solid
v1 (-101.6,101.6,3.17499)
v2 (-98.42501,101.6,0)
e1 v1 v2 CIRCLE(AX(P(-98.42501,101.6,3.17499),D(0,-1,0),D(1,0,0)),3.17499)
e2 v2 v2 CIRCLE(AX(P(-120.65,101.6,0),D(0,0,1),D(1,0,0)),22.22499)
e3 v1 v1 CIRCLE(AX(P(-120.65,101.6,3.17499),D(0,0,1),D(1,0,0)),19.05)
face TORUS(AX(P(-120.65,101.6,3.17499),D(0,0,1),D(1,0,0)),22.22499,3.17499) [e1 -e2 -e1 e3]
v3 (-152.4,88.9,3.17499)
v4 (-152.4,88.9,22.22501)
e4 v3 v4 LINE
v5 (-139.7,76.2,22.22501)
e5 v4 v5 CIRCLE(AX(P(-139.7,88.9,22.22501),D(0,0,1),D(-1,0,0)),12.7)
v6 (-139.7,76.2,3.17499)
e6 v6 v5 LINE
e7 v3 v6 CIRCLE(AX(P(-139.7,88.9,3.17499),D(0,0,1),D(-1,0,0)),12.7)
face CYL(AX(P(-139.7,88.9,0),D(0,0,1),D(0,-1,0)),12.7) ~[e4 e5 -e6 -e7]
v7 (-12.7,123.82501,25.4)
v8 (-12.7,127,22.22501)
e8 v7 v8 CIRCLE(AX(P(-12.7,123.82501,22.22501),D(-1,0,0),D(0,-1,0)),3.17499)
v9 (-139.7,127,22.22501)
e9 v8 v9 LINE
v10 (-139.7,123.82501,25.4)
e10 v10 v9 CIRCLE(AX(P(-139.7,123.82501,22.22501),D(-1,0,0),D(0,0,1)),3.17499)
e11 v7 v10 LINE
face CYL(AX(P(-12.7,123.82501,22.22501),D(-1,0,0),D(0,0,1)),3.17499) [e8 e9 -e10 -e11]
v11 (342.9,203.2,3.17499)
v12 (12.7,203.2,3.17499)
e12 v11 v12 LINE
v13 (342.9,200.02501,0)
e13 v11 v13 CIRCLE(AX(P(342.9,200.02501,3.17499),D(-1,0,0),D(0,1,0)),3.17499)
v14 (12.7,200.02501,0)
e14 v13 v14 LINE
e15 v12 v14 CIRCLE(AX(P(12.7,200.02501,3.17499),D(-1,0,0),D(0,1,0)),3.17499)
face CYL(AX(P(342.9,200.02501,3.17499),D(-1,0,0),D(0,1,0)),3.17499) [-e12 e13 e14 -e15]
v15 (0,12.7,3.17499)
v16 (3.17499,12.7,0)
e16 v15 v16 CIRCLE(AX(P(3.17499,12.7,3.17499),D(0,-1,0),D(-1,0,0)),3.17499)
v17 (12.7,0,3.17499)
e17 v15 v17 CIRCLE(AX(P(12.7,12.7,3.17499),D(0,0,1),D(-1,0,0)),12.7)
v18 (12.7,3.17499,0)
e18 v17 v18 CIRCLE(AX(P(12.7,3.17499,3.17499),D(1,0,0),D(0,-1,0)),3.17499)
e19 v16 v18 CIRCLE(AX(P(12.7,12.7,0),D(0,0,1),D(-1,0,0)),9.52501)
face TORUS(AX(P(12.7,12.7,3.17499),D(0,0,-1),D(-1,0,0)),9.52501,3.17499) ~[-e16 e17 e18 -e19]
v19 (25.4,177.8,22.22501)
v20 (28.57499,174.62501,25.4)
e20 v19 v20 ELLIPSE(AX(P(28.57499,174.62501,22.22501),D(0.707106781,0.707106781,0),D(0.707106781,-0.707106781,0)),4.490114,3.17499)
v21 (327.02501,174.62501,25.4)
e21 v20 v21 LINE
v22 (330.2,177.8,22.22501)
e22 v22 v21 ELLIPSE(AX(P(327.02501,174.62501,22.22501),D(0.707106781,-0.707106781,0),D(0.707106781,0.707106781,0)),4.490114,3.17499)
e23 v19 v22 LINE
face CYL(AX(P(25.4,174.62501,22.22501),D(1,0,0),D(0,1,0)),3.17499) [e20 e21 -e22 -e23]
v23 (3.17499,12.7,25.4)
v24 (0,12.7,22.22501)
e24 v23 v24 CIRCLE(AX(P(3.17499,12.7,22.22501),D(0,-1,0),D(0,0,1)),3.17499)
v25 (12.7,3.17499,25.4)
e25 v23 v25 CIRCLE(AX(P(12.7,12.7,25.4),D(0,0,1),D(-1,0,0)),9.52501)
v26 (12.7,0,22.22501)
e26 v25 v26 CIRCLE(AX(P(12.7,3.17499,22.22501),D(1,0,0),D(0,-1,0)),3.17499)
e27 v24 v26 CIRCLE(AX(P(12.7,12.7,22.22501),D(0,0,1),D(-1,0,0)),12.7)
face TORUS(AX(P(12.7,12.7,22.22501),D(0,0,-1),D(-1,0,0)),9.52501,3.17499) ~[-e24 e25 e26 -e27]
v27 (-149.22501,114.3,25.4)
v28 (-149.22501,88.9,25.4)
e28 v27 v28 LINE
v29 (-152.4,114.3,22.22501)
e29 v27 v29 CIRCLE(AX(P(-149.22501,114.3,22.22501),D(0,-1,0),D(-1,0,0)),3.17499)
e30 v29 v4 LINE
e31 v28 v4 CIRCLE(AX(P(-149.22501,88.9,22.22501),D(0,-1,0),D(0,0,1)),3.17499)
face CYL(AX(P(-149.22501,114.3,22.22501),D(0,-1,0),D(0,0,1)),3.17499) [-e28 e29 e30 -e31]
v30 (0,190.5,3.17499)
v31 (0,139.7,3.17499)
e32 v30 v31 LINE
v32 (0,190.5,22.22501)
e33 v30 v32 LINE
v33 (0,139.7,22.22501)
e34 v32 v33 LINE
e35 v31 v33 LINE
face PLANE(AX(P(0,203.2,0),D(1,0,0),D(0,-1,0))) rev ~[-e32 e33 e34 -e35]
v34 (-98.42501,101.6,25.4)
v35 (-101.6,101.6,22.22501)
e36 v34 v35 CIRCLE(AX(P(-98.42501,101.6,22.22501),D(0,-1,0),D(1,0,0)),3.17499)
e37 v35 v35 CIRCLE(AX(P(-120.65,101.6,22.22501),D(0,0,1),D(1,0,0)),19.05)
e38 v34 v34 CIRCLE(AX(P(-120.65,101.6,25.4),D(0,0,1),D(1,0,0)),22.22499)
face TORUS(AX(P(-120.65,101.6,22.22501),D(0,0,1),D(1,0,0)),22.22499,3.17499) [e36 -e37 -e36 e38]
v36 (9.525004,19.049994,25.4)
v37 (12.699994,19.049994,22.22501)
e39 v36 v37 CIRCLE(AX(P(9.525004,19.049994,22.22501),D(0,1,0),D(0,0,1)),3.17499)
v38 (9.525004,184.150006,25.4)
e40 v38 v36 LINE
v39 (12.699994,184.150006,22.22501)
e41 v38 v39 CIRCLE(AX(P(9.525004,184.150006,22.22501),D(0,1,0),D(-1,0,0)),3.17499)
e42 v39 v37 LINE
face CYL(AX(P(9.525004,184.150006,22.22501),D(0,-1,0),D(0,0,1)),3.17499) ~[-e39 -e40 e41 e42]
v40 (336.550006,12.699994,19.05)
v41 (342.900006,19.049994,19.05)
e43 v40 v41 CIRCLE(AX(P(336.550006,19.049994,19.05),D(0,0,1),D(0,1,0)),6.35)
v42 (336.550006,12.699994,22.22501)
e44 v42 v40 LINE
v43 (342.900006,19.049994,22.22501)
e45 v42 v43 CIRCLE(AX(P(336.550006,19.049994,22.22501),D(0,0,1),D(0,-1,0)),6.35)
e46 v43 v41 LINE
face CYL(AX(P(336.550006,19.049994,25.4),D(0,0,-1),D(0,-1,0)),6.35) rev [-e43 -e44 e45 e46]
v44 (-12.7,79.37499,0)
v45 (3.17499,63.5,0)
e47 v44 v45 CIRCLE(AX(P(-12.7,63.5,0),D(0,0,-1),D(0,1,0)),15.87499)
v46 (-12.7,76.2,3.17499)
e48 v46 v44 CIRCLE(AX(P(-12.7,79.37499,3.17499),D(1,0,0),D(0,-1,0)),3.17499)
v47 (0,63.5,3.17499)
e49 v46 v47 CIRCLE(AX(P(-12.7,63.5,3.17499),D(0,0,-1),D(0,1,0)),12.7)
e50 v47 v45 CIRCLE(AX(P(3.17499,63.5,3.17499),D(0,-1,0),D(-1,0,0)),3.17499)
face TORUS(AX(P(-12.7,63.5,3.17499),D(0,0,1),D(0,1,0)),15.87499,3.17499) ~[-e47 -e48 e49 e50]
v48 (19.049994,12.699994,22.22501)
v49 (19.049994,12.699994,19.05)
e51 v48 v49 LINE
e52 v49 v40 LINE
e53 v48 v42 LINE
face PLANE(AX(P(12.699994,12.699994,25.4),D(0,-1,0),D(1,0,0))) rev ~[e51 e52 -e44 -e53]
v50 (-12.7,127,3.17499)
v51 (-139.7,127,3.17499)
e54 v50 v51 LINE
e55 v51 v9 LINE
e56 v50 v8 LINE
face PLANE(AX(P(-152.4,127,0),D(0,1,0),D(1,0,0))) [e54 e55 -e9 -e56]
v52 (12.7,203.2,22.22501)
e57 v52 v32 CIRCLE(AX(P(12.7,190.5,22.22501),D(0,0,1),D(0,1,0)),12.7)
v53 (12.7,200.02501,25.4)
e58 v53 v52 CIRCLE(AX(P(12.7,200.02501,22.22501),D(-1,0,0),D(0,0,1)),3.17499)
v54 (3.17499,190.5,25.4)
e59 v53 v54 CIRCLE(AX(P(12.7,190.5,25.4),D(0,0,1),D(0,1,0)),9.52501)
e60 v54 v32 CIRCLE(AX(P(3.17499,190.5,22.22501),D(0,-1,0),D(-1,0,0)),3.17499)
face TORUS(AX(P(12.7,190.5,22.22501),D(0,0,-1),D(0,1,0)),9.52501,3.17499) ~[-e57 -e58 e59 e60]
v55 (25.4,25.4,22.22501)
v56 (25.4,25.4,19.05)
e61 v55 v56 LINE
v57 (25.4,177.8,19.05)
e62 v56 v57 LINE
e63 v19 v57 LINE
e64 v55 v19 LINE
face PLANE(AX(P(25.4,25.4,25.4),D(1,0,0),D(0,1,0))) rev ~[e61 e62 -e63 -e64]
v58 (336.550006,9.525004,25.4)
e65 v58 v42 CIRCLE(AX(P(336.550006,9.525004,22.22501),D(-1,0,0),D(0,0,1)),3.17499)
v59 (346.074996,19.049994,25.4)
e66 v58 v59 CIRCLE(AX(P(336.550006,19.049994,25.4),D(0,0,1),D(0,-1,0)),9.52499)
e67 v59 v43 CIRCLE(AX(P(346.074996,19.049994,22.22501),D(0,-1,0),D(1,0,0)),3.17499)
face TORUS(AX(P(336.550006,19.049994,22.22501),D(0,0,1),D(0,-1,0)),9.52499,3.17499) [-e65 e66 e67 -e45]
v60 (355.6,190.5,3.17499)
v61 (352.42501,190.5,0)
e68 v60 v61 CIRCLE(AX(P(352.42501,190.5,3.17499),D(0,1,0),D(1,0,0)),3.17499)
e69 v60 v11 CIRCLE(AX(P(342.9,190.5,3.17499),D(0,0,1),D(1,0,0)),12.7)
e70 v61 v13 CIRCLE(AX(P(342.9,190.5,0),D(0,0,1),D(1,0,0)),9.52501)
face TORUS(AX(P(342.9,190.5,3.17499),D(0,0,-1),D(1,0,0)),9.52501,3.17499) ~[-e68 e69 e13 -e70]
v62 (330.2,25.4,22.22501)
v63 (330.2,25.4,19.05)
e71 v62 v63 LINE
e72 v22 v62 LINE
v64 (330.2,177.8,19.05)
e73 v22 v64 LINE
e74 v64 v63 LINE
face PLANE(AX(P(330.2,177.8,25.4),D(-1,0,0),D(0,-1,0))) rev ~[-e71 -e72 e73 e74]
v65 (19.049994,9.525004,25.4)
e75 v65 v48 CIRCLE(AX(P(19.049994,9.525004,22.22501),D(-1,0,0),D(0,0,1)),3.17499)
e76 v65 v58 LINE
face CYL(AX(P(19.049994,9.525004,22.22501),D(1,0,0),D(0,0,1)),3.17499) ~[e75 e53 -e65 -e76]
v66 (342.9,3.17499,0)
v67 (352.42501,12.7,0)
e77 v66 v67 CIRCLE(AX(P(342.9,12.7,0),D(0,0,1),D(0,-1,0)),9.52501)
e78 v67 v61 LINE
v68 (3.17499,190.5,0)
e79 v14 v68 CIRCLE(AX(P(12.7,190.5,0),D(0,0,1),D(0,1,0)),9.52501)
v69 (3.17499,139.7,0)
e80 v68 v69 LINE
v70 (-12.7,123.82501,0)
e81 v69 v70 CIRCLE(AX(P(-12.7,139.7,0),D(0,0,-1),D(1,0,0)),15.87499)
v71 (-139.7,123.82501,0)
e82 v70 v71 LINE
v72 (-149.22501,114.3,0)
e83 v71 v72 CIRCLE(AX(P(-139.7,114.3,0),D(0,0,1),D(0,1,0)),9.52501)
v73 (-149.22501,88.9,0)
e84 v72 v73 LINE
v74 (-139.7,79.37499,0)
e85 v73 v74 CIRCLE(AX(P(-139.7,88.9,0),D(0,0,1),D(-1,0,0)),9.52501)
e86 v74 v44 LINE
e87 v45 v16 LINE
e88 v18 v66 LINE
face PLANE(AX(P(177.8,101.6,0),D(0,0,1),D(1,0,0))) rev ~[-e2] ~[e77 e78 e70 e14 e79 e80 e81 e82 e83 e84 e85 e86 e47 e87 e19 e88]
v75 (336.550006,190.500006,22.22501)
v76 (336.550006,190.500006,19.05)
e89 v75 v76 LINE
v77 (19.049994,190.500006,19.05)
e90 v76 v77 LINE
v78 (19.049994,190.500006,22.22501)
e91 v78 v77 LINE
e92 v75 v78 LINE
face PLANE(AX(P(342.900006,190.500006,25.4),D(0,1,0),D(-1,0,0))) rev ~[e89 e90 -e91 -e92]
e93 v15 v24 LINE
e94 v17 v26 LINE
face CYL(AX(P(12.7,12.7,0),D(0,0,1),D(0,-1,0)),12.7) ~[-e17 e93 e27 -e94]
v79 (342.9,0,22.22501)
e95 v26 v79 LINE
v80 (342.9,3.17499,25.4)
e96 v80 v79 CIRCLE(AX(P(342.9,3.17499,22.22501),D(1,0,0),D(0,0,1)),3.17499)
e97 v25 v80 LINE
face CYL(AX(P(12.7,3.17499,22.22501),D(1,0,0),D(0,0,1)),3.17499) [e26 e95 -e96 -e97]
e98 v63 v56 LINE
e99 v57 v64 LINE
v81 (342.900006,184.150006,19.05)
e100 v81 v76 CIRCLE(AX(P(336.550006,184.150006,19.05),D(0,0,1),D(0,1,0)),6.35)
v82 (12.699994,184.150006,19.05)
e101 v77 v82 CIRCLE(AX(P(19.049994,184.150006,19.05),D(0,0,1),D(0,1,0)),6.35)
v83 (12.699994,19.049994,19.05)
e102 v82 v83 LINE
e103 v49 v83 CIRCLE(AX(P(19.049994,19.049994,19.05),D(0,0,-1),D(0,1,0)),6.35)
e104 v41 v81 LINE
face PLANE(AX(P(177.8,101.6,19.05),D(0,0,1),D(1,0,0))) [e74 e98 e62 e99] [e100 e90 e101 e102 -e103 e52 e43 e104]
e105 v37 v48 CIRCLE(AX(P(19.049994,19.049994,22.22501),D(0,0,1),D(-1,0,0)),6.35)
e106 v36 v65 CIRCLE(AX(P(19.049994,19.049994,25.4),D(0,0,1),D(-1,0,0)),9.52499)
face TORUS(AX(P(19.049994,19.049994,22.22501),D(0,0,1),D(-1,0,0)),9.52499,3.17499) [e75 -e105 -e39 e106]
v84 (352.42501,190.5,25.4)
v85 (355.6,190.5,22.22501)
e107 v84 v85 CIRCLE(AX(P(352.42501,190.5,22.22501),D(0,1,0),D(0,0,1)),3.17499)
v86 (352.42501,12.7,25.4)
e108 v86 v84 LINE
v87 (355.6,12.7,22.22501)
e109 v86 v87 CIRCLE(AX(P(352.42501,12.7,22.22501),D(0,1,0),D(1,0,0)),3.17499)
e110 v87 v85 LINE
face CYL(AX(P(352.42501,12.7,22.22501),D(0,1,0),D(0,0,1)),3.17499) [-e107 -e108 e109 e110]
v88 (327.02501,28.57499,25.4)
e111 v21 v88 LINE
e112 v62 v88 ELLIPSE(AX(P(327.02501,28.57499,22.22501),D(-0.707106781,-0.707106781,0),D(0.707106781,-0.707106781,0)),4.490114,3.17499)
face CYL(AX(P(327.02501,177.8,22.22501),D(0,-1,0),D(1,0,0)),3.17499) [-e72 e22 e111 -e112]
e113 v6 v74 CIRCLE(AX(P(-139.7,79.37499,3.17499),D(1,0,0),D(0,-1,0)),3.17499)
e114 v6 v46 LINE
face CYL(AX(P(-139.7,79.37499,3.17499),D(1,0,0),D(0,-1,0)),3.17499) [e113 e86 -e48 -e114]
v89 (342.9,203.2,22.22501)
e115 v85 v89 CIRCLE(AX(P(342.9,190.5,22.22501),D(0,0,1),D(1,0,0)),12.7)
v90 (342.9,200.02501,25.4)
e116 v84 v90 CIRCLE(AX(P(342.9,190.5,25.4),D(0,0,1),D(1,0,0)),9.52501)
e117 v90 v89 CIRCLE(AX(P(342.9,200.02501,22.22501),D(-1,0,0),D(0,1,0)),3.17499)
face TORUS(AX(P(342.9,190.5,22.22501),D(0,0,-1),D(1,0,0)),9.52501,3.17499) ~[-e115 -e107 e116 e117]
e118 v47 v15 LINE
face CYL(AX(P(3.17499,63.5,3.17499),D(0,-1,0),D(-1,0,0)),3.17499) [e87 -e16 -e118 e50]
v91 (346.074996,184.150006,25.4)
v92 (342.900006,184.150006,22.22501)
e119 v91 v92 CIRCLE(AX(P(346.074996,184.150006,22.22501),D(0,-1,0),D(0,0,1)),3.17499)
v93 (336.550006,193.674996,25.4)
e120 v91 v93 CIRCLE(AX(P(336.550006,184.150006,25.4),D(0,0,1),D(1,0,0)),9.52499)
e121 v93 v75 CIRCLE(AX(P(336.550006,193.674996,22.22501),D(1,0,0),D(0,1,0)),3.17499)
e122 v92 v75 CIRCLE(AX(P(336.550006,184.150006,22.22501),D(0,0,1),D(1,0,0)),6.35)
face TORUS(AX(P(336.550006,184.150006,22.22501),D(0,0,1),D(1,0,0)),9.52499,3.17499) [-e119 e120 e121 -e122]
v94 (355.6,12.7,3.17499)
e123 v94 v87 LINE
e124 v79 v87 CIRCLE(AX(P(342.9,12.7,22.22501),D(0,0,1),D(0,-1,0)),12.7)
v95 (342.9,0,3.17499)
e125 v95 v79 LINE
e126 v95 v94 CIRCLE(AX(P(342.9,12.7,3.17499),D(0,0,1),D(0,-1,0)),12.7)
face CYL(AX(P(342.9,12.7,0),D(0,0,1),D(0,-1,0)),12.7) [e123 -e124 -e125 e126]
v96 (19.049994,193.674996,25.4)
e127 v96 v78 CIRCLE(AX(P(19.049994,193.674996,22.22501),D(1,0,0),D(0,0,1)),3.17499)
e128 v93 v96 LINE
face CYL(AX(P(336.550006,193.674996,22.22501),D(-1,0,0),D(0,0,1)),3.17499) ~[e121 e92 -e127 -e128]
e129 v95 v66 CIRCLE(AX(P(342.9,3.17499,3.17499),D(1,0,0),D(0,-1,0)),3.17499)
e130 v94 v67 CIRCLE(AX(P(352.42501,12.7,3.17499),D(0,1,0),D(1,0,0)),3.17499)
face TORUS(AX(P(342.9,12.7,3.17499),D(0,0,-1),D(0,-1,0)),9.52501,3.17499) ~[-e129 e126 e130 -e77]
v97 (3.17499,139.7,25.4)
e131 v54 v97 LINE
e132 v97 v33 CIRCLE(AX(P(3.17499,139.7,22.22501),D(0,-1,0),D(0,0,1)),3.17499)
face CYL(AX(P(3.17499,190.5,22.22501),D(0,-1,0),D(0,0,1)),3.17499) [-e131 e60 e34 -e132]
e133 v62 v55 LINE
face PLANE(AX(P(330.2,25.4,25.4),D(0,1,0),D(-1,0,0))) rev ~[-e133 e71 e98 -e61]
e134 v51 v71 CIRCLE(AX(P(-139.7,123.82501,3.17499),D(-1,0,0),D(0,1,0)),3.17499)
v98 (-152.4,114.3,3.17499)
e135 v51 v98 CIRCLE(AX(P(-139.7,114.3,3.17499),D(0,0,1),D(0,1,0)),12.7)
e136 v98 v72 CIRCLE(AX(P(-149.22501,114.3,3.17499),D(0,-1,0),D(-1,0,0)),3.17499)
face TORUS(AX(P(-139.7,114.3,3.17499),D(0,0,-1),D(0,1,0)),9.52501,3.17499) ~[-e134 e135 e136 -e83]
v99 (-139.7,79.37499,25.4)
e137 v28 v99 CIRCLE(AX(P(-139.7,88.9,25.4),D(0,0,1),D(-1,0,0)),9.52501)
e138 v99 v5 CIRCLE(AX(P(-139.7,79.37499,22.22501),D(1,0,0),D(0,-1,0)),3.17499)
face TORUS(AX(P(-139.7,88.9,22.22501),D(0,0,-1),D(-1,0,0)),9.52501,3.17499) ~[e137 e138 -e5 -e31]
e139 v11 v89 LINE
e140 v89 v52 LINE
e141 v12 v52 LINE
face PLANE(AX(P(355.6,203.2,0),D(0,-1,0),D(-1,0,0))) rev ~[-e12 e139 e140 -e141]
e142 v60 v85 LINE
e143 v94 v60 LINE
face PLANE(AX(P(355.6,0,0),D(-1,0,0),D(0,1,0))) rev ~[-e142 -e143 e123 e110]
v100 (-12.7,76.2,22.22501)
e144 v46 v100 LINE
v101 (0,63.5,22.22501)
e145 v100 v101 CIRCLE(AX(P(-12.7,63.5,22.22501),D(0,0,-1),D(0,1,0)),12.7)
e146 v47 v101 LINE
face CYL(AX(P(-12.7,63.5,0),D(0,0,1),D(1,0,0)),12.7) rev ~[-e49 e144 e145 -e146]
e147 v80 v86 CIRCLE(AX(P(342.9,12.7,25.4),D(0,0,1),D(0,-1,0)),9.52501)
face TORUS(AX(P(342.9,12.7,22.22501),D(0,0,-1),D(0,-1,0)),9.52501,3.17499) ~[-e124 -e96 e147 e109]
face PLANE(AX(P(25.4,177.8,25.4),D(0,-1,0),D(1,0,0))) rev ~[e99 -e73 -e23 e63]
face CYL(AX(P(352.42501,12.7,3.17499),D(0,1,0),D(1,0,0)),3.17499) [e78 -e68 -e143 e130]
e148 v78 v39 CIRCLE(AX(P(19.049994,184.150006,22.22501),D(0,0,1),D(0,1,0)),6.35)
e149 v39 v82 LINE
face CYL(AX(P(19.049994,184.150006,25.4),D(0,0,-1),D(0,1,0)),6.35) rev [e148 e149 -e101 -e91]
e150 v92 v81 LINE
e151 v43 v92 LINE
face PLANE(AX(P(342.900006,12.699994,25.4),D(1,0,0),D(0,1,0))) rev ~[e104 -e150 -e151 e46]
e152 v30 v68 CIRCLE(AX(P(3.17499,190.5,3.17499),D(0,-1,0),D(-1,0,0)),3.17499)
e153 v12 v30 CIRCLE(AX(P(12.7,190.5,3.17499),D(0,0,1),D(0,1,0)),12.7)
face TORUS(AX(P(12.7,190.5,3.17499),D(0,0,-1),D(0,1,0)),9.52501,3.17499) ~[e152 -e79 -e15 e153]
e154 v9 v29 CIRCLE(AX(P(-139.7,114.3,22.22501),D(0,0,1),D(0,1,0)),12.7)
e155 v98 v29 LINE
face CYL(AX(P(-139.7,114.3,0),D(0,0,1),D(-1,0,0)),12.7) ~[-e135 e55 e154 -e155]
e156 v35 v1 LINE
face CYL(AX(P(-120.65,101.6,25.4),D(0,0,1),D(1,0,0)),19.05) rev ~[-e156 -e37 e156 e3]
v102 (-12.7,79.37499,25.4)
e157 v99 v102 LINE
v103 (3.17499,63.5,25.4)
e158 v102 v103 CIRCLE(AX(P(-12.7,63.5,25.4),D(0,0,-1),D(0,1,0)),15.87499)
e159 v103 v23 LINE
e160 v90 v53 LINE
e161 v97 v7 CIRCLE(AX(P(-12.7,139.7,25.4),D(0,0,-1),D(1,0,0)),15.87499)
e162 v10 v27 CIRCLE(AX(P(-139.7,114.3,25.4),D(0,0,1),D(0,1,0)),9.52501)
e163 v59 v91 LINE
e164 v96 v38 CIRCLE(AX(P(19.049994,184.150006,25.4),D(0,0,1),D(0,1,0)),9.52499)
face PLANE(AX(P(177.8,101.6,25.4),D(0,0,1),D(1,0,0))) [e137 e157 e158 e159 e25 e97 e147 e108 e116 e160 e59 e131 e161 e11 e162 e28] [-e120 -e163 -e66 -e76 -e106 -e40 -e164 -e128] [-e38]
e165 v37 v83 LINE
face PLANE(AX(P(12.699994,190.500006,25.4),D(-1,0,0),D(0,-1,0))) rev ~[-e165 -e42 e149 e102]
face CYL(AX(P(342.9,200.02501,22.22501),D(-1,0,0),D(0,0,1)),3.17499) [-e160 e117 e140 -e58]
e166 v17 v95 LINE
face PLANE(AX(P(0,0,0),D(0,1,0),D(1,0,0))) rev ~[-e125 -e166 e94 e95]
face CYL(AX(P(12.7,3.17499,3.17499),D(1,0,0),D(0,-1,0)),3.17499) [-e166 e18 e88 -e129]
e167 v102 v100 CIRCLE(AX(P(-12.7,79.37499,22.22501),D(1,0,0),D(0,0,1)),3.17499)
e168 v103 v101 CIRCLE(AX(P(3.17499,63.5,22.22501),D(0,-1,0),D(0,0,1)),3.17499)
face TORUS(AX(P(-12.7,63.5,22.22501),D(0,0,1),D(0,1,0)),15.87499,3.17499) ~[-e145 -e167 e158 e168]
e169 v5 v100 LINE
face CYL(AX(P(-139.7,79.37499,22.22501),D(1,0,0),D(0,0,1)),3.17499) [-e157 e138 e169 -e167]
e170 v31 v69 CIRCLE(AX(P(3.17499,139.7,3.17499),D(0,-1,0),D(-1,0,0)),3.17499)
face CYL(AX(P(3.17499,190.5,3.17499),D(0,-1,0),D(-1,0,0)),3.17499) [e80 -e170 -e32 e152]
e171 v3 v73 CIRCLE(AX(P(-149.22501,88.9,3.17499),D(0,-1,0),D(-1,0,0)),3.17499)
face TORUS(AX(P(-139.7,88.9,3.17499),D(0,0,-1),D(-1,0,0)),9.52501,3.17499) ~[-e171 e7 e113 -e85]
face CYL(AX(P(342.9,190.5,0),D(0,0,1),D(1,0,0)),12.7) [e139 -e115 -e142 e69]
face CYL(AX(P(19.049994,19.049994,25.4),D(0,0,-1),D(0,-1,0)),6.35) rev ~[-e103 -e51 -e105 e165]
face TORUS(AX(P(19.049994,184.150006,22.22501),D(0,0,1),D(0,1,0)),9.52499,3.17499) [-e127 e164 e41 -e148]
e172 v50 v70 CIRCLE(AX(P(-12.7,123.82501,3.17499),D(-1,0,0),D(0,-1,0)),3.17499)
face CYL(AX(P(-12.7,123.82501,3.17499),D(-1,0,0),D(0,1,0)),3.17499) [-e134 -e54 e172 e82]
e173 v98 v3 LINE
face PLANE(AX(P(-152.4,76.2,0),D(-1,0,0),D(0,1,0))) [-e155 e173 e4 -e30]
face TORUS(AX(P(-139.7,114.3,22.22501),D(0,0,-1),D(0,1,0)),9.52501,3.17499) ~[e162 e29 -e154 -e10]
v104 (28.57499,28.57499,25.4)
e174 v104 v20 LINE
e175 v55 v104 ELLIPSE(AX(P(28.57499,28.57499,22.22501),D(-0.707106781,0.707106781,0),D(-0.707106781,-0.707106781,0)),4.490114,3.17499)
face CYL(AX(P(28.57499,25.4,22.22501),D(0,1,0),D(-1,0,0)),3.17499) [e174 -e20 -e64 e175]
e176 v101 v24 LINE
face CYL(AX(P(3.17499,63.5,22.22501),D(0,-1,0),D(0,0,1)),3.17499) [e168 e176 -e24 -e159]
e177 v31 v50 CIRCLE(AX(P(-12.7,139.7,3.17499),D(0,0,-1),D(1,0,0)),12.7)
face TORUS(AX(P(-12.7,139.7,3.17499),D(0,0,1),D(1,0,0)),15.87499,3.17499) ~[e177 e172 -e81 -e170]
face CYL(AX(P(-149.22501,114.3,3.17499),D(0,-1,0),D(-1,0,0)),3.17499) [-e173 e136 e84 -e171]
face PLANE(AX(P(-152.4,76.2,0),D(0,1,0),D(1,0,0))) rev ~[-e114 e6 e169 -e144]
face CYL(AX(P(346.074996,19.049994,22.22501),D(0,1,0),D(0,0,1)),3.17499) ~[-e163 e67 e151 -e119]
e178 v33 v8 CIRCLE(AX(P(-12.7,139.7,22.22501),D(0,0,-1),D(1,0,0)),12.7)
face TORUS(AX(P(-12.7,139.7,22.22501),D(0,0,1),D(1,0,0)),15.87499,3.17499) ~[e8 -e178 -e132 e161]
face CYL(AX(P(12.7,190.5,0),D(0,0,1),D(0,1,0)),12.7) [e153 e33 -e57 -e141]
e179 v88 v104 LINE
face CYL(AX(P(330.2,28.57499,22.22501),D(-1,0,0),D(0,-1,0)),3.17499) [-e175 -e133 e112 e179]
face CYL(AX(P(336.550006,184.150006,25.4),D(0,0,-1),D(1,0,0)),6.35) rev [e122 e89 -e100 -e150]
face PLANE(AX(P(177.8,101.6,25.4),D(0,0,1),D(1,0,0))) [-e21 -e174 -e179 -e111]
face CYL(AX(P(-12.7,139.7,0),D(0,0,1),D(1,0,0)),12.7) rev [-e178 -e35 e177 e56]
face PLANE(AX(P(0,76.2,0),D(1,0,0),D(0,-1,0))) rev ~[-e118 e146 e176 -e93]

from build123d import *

# Parameters (mm, degrees)
F0_W     = 152.4
F0_H     = 50.8
F1_DEPTH = 25.4
F2_R     = 19.05
F3_DEPTH = 25.4
F5_DEPTH = 6.35
F6_R     = 6.35
F7_R     = 12.7
F8_R     = 12.7
F9_R     = 3.17499


# Not quite as in the source:
# - a fillet or chamfer is up to 0.001 mm smaller than in the source, because OpenCascade refuses the exact size


with BuildPart() as f1:
    # F0 (on Top) → F1 (new body)
    with BuildSketch(Plane.XY):
        Polygon((0, 76.2), (0, 0), (355.6, 0), (355.6, 203.2), (0, 203.2), (0, 127), align=None)
        with Locations((-76.2, 101.6)):
            Rectangle(F0_W, F0_H)
    extrude(amount=F1_DEPTH)

    # F2 (on face) → F3 (cut)
    with BuildSketch(Plane.XY.offset(25.4)):
        with Locations((-120.65, 101.6)):
            Circle(F2_R)
    extrude(amount=-F3_DEPTH, mode=Mode.SUBTRACT)

    # F4 (on face) → F5 (cut)
    with BuildSketch(Plane.XY.offset(25.4)):
        Polygon((12.6999939203, 76.2), (12.6999939203, 12.6999939203), (342.9000060797, 12.6999939203), (342.9000060797, 190.5000060797), (12.6999939203, 190.5000060797), (12.6999939203, 127), align=None)
        Polygon((25.4000002861, 76.2), (25.4000002861, 127), (25.4000002861, 177.7999997139), (330.1999997139, 177.7999997139), (330.1999997139, 25.4000002861), (25.4000002861, 25.4000002861), align=None, mode=Mode.SUBTRACT)
    extrude(amount=-F5_DEPTH, mode=Mode.SUBTRACT)

    # F6
    f6_edges = [f1.edges().sort_by_distance(p)[0] for p in [
        (12.699994, 190.500006, 22.225),
        (342.900006, 190.500006, 22.225),
        (342.900006, 12.699994, 22.225),
        (12.699994, 12.699994, 22.225),
    ]]
    fillet(f6_edges, radius=F6_R)

    # F7
    f7_edges = [f1.edges().sort_by_distance(p)[0] for p in [
        (0, 0, 12.7),
        (-152.4, 76.2, 12.7),
        (-152.4, 127, 12.7),
        (0, 203.2, 12.7),
        (355.6, 203.2, 12.7),
        (355.6, 0, 12.7),
    ]]
    fillet(f7_edges, radius=F7_R)

    # F8
    f8_edges = [f1.edges().sort_by_distance(p)[0] for p in [
        (0, 76.2, 12.7),
        (0, 127, 12.7),
    ]]
    fillet(f8_edges, radius=F8_R)

    # F9 (radius 3.175 in the source; OpenCascade refuses exactly that, so slightly less here)
    f9_edges = [f1.edges().sort_by_distance(p)[0] for p in [
        (177.8, 177.8, 25.4),
        (330.2, 101.6, 25.4),
        (177.8, 25.4, 25.4),
        (25.4, 101.6, 25.4),
        (0, 38.1, 25.4),
        (-3.719744, 72.480256, 25.4),
        (3.719744, 3.719744, 25.4),
        (-76.2, 76.2, 25.4),
        (177.8, 0, 25.4),
        (-148.680256, 79.919744, 25.4),
        (351.880256, 3.719744, 25.4),
        (-152.4, 101.6, 25.4),
        (355.6, 101.6, 25.4),
        (-148.680256, 123.280256, 25.4),
        (351.880256, 199.480256, 25.4),
        (-76.2, 127, 25.4),
        (177.8, 203.2, 25.4),
        (-3.719744, 130.719744, 25.4),
        (3.719744, 199.480256, 25.4),
        (0, 165.1, 25.4),
        (177.8, 12.699994, 25.4),
        (14.559866, 14.559866, 25.4),
        (341.040134, 14.559866, 25.4),
        (12.699994, 101.6, 25.4),
        (342.900006, 101.6, 25.4),
        (14.559866, 188.640134, 25.4),
        (341.040134, 188.640134, 25.4),
        (177.8, 190.500006, 25.4),
        (-139.7, 101.6, 25.4),
        (0, 38.1, 0),
        (-3.719744, 72.480256, 0),
        (3.719744, 3.719744, 0),
        (-76.2, 76.2, 0),
        (177.8, 0, 0),
        (-148.680256, 79.919744, 0),
        (351.880256, 3.719744, 0),
        (-152.4, 101.6, 0),
        (355.6, 101.6, 0),
        (-148.680256, 123.280256, 0),
        (351.880256, 199.480256, 0),
        (-76.2, 127, 0),
        (177.8, 203.2, 0),
        (-3.719744, 130.719744, 0),
        (3.719744, 199.480256, 0),
        (0, 165.1, 0),
        (-139.7, 101.6, 0),
    ]]
    fillet(f9_edges, radius=F9_R)


solid = f1.part
